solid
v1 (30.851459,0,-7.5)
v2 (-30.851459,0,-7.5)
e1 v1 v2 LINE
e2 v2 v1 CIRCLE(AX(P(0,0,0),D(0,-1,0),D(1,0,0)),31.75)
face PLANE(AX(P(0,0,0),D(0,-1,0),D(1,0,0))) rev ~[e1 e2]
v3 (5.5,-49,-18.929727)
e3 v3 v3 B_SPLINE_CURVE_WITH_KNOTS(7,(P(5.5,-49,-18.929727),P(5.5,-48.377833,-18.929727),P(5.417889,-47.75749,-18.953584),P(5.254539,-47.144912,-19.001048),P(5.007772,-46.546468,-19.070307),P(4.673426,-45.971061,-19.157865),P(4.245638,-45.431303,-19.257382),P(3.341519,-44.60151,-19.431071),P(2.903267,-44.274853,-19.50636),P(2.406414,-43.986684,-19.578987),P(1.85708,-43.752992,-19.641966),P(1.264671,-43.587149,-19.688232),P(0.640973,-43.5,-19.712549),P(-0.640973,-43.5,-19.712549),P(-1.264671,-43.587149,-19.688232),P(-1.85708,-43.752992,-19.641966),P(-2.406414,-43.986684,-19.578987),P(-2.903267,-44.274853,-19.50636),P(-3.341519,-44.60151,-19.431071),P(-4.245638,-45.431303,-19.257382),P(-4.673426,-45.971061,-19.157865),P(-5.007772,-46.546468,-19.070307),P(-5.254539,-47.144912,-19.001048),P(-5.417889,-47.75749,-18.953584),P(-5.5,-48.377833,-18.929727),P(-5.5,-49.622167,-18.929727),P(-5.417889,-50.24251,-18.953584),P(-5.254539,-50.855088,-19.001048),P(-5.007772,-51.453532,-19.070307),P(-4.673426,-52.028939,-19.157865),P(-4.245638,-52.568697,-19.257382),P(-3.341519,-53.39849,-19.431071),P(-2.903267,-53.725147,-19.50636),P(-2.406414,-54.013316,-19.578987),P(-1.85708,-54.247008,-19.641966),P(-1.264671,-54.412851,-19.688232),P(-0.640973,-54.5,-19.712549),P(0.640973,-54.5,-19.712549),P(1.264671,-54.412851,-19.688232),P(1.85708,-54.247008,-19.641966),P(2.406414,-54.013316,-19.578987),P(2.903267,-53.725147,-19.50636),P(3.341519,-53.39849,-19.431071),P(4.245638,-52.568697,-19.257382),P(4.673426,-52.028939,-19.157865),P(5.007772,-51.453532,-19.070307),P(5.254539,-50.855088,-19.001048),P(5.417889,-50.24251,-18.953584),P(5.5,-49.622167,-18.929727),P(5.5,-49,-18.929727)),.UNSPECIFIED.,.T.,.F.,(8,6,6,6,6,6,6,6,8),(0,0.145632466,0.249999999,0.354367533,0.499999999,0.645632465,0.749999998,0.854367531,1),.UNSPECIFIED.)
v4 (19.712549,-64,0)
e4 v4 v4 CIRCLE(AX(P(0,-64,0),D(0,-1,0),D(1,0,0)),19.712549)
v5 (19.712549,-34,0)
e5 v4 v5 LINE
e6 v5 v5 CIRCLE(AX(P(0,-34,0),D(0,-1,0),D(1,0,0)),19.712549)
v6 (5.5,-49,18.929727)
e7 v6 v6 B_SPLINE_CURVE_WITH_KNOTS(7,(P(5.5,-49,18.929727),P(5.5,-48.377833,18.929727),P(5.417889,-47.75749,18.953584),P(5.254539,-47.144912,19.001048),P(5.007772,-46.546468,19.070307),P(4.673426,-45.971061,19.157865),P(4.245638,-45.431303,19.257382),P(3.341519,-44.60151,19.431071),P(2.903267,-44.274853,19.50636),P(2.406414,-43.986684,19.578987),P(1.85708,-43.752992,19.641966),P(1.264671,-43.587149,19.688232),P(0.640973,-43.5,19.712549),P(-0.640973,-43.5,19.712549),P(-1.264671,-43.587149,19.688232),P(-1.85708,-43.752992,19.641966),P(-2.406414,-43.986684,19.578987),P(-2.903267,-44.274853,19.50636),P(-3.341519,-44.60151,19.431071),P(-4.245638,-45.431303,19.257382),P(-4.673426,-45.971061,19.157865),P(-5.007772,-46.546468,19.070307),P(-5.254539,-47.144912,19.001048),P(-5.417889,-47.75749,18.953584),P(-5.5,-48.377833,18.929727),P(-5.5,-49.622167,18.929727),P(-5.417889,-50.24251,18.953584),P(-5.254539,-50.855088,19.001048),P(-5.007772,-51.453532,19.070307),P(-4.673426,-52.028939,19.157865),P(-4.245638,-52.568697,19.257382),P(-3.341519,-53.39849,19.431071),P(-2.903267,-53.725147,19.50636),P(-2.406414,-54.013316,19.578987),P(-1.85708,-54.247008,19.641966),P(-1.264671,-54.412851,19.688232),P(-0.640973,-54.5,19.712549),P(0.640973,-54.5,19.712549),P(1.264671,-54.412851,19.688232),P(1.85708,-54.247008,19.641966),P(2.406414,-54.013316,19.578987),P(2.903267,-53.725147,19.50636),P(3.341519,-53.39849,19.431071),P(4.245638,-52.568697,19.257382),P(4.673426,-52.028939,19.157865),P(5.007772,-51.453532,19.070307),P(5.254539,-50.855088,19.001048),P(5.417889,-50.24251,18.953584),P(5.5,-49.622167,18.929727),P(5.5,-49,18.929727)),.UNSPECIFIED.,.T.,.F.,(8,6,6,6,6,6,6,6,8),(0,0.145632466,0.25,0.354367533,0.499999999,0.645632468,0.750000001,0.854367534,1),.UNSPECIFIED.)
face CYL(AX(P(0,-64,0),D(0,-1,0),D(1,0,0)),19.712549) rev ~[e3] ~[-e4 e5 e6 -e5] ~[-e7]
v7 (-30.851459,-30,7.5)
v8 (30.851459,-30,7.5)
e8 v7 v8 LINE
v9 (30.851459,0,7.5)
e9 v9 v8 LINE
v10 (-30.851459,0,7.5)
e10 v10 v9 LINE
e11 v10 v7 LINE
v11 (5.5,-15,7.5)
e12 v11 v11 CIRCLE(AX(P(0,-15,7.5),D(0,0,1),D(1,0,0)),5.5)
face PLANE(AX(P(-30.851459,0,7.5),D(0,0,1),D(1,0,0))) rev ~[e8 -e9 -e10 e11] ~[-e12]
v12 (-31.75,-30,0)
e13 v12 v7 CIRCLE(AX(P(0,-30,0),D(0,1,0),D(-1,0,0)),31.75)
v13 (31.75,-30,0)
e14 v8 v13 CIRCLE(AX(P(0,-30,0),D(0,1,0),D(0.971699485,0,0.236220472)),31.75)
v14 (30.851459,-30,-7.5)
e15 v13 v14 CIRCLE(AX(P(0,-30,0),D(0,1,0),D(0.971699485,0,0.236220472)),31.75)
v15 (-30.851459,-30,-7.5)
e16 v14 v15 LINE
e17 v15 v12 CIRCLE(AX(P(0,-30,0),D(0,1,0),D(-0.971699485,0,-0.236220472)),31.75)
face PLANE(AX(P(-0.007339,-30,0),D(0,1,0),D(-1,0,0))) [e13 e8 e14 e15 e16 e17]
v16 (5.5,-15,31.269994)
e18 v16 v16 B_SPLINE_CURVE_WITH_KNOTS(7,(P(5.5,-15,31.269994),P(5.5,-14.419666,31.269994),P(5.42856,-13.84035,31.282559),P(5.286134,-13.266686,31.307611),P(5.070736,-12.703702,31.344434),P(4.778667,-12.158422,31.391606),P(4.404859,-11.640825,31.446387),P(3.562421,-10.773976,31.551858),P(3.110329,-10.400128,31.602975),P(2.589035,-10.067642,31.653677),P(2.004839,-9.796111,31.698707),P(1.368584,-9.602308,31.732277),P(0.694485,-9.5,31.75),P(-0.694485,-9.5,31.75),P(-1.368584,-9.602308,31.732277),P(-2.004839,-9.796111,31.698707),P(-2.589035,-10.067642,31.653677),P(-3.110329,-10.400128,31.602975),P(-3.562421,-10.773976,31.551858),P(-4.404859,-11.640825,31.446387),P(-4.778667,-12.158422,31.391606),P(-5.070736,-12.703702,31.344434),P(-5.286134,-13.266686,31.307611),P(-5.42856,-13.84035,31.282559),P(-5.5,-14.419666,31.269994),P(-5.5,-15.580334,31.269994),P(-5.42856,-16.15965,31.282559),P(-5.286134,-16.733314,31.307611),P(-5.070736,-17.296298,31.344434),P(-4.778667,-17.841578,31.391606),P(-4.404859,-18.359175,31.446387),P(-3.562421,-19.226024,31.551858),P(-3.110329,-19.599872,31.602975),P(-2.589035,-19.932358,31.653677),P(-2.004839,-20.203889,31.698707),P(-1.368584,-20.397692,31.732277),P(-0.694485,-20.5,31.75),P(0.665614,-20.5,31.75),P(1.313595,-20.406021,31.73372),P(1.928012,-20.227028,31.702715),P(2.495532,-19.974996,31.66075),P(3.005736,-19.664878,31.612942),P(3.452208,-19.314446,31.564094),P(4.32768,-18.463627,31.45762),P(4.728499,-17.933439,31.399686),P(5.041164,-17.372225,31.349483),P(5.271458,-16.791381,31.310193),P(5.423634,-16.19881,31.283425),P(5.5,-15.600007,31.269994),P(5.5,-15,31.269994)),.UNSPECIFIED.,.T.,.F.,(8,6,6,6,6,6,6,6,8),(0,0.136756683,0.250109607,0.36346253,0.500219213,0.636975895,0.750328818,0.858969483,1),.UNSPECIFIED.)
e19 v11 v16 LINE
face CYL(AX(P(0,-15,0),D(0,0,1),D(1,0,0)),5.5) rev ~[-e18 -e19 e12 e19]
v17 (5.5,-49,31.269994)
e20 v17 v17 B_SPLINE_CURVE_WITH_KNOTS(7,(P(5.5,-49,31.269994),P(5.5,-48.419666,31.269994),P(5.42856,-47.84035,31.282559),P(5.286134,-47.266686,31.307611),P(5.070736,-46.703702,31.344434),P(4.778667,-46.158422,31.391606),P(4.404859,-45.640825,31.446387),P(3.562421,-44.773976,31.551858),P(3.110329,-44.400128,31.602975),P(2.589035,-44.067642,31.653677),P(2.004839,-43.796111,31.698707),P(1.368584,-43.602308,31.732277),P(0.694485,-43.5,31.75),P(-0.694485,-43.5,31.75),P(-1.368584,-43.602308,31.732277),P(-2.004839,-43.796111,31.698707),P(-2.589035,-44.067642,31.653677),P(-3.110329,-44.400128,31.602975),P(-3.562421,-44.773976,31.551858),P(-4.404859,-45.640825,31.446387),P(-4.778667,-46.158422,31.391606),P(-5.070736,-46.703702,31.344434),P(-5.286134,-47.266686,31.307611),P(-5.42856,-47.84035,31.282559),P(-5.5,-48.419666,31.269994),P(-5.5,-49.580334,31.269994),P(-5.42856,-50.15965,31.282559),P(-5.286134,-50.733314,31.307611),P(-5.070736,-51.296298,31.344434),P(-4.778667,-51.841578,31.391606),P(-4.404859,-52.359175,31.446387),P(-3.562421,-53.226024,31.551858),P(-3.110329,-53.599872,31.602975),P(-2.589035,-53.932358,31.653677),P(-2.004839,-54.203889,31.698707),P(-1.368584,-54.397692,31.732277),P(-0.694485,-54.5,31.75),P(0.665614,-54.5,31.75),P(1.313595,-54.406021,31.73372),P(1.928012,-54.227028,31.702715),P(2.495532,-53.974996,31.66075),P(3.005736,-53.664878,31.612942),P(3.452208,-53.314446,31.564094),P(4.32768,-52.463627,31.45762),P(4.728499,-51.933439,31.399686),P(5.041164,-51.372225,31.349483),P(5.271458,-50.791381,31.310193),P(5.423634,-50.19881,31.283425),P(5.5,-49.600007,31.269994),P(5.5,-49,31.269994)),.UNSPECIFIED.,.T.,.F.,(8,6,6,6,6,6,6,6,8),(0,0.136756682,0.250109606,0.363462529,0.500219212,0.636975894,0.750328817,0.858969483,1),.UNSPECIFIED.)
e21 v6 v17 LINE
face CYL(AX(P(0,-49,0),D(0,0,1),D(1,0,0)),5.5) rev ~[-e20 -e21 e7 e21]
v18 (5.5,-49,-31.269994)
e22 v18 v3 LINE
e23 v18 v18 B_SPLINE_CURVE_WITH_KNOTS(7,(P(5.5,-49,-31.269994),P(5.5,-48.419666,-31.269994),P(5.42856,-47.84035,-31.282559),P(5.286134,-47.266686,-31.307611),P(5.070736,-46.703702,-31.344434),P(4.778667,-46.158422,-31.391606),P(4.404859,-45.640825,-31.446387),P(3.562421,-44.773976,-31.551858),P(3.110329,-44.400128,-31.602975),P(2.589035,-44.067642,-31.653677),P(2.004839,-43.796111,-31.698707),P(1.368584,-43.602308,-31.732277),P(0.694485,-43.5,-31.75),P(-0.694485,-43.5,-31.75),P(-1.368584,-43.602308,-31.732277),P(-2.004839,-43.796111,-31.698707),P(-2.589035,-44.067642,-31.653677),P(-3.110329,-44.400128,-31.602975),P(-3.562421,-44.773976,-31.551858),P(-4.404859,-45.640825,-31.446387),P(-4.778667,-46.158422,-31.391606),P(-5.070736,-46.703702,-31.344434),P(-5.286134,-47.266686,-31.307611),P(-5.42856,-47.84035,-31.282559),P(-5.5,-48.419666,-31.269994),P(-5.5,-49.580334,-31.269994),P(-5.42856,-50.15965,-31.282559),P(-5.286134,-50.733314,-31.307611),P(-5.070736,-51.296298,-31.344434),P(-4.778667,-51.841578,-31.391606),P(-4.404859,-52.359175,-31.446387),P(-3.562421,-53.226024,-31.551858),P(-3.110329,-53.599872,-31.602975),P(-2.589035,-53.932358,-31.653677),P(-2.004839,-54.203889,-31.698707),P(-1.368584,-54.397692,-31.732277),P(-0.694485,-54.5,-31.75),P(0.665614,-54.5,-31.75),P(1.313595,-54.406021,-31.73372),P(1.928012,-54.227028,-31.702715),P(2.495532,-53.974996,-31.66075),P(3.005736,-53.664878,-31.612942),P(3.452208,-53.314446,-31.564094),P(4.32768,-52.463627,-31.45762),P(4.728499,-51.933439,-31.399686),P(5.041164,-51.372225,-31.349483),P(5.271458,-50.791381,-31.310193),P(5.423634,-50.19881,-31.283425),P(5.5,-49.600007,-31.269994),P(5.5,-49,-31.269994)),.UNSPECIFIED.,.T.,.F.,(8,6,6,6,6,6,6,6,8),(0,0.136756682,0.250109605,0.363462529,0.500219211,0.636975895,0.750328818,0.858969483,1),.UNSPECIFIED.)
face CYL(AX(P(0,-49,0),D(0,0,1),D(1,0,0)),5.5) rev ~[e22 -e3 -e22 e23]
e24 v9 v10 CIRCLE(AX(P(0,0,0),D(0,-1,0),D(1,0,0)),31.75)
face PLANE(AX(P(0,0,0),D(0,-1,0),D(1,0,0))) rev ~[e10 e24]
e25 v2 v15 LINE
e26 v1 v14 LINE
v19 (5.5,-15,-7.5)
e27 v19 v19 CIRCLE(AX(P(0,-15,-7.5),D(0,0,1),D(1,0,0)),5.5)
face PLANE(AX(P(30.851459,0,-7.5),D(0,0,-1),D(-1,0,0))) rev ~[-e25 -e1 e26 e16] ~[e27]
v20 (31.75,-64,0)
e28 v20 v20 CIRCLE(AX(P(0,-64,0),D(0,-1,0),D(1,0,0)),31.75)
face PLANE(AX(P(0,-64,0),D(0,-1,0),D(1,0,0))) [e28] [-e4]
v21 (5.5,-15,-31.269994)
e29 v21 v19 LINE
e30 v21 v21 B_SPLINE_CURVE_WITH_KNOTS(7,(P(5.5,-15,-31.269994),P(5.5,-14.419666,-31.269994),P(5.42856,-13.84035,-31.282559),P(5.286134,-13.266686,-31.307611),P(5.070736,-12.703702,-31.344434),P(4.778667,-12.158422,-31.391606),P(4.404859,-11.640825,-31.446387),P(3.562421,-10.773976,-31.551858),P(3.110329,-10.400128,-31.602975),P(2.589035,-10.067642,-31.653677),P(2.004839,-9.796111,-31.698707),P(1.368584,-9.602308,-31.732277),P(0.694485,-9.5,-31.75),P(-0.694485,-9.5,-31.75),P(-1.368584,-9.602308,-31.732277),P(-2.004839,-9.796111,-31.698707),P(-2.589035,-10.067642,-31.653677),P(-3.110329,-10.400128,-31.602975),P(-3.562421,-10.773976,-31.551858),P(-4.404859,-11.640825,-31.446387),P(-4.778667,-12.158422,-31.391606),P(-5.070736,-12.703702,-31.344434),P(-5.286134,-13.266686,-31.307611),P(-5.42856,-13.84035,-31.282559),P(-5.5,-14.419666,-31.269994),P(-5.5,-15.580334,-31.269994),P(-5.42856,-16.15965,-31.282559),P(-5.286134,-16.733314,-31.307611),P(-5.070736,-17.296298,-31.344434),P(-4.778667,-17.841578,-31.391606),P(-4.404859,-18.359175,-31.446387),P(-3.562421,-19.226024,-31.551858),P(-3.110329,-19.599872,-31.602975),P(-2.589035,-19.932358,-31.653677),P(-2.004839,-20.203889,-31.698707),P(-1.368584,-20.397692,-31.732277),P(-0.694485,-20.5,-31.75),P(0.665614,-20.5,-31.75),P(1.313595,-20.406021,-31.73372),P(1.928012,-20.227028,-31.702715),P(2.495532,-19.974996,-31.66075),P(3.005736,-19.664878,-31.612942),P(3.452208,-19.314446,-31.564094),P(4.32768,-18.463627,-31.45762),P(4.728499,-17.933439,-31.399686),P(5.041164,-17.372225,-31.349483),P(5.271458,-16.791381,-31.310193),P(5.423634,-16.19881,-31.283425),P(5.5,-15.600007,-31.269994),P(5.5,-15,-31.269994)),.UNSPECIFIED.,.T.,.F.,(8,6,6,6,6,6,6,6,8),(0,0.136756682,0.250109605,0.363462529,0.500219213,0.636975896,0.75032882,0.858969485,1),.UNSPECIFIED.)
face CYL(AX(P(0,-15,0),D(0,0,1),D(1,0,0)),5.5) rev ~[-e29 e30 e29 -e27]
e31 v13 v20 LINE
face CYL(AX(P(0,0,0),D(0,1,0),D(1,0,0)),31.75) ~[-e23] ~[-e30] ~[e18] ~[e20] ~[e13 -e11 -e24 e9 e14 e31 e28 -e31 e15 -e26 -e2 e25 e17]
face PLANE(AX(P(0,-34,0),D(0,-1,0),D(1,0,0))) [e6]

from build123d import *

# Parameters (mm, degrees)
F0_R     = 31.75
F1_DEPTH = 64
F2_R     = 19.7125485486
F3_DEPTH = 30
F5_DEPTH = 30
F6_R     = 5.5
F7_DEPTH = 35
F8_R     = 5.5
F9_DEPTH = 35


# Not quite as in the source:
# - the program builds the solid bodies; features that only make, move or delete a surface that nothing else refers to are left out


with BuildPart() as f1:
    # F0 (on Front) → F1 (new body)
    with BuildSketch(Plane.XZ):
        Circle(F0_R)
    extrude(amount=F1_DEPTH)

    # F2 (on face) → F3 (cut)
    with BuildSketch(Plane.XZ.offset(64)):
        Circle(F2_R)
    extrude(amount=-F3_DEPTH, mode=Mode.SUBTRACT)

    # F4 (on face) → F5 (cut)
    with BuildSketch(Plane(origin=(0, 0, 0), x_dir=(-1, 0, 0), z_dir=(0, 1, 0))):
        with BuildLine():
            Line((-30.8514586365, -7.5), (30.8514586365, -7.5))
            ThreePointArc((30.8514586365, -7.5), (31.5245643246, -3.7768166682), (31.75, 0))
            ThreePointArc((31.75, 0), (31.5245643246, 3.7768166682), (30.8514586365, 7.5))
            Line((30.8514586365, 7.5), (-30.8514586365, 7.5))
            ThreePointArc((-30.8514586365, 7.5), (-31.75, 0), (-30.8514586365, -7.5))
        make_face()
    extrude(amount=-F5_DEPTH, mode=Mode.SUBTRACT)

    # F6 (on Top) → F7 (cut, symmetric)
    with BuildSketch(Plane.XY):
        with Locations((0, -49)):
            Circle(F6_R)
    extrude(amount=F7_DEPTH, both=True, mode=Mode.SUBTRACT)

    # F8 (on Top) → F9 (cut, symmetric)
    with BuildSketch(Plane.XY):
        with Locations((0, -15)):
            Circle(F8_R)
    extrude(amount=F9_DEPTH, both=True, mode=Mode.SUBTRACT)


solid = f1.part
